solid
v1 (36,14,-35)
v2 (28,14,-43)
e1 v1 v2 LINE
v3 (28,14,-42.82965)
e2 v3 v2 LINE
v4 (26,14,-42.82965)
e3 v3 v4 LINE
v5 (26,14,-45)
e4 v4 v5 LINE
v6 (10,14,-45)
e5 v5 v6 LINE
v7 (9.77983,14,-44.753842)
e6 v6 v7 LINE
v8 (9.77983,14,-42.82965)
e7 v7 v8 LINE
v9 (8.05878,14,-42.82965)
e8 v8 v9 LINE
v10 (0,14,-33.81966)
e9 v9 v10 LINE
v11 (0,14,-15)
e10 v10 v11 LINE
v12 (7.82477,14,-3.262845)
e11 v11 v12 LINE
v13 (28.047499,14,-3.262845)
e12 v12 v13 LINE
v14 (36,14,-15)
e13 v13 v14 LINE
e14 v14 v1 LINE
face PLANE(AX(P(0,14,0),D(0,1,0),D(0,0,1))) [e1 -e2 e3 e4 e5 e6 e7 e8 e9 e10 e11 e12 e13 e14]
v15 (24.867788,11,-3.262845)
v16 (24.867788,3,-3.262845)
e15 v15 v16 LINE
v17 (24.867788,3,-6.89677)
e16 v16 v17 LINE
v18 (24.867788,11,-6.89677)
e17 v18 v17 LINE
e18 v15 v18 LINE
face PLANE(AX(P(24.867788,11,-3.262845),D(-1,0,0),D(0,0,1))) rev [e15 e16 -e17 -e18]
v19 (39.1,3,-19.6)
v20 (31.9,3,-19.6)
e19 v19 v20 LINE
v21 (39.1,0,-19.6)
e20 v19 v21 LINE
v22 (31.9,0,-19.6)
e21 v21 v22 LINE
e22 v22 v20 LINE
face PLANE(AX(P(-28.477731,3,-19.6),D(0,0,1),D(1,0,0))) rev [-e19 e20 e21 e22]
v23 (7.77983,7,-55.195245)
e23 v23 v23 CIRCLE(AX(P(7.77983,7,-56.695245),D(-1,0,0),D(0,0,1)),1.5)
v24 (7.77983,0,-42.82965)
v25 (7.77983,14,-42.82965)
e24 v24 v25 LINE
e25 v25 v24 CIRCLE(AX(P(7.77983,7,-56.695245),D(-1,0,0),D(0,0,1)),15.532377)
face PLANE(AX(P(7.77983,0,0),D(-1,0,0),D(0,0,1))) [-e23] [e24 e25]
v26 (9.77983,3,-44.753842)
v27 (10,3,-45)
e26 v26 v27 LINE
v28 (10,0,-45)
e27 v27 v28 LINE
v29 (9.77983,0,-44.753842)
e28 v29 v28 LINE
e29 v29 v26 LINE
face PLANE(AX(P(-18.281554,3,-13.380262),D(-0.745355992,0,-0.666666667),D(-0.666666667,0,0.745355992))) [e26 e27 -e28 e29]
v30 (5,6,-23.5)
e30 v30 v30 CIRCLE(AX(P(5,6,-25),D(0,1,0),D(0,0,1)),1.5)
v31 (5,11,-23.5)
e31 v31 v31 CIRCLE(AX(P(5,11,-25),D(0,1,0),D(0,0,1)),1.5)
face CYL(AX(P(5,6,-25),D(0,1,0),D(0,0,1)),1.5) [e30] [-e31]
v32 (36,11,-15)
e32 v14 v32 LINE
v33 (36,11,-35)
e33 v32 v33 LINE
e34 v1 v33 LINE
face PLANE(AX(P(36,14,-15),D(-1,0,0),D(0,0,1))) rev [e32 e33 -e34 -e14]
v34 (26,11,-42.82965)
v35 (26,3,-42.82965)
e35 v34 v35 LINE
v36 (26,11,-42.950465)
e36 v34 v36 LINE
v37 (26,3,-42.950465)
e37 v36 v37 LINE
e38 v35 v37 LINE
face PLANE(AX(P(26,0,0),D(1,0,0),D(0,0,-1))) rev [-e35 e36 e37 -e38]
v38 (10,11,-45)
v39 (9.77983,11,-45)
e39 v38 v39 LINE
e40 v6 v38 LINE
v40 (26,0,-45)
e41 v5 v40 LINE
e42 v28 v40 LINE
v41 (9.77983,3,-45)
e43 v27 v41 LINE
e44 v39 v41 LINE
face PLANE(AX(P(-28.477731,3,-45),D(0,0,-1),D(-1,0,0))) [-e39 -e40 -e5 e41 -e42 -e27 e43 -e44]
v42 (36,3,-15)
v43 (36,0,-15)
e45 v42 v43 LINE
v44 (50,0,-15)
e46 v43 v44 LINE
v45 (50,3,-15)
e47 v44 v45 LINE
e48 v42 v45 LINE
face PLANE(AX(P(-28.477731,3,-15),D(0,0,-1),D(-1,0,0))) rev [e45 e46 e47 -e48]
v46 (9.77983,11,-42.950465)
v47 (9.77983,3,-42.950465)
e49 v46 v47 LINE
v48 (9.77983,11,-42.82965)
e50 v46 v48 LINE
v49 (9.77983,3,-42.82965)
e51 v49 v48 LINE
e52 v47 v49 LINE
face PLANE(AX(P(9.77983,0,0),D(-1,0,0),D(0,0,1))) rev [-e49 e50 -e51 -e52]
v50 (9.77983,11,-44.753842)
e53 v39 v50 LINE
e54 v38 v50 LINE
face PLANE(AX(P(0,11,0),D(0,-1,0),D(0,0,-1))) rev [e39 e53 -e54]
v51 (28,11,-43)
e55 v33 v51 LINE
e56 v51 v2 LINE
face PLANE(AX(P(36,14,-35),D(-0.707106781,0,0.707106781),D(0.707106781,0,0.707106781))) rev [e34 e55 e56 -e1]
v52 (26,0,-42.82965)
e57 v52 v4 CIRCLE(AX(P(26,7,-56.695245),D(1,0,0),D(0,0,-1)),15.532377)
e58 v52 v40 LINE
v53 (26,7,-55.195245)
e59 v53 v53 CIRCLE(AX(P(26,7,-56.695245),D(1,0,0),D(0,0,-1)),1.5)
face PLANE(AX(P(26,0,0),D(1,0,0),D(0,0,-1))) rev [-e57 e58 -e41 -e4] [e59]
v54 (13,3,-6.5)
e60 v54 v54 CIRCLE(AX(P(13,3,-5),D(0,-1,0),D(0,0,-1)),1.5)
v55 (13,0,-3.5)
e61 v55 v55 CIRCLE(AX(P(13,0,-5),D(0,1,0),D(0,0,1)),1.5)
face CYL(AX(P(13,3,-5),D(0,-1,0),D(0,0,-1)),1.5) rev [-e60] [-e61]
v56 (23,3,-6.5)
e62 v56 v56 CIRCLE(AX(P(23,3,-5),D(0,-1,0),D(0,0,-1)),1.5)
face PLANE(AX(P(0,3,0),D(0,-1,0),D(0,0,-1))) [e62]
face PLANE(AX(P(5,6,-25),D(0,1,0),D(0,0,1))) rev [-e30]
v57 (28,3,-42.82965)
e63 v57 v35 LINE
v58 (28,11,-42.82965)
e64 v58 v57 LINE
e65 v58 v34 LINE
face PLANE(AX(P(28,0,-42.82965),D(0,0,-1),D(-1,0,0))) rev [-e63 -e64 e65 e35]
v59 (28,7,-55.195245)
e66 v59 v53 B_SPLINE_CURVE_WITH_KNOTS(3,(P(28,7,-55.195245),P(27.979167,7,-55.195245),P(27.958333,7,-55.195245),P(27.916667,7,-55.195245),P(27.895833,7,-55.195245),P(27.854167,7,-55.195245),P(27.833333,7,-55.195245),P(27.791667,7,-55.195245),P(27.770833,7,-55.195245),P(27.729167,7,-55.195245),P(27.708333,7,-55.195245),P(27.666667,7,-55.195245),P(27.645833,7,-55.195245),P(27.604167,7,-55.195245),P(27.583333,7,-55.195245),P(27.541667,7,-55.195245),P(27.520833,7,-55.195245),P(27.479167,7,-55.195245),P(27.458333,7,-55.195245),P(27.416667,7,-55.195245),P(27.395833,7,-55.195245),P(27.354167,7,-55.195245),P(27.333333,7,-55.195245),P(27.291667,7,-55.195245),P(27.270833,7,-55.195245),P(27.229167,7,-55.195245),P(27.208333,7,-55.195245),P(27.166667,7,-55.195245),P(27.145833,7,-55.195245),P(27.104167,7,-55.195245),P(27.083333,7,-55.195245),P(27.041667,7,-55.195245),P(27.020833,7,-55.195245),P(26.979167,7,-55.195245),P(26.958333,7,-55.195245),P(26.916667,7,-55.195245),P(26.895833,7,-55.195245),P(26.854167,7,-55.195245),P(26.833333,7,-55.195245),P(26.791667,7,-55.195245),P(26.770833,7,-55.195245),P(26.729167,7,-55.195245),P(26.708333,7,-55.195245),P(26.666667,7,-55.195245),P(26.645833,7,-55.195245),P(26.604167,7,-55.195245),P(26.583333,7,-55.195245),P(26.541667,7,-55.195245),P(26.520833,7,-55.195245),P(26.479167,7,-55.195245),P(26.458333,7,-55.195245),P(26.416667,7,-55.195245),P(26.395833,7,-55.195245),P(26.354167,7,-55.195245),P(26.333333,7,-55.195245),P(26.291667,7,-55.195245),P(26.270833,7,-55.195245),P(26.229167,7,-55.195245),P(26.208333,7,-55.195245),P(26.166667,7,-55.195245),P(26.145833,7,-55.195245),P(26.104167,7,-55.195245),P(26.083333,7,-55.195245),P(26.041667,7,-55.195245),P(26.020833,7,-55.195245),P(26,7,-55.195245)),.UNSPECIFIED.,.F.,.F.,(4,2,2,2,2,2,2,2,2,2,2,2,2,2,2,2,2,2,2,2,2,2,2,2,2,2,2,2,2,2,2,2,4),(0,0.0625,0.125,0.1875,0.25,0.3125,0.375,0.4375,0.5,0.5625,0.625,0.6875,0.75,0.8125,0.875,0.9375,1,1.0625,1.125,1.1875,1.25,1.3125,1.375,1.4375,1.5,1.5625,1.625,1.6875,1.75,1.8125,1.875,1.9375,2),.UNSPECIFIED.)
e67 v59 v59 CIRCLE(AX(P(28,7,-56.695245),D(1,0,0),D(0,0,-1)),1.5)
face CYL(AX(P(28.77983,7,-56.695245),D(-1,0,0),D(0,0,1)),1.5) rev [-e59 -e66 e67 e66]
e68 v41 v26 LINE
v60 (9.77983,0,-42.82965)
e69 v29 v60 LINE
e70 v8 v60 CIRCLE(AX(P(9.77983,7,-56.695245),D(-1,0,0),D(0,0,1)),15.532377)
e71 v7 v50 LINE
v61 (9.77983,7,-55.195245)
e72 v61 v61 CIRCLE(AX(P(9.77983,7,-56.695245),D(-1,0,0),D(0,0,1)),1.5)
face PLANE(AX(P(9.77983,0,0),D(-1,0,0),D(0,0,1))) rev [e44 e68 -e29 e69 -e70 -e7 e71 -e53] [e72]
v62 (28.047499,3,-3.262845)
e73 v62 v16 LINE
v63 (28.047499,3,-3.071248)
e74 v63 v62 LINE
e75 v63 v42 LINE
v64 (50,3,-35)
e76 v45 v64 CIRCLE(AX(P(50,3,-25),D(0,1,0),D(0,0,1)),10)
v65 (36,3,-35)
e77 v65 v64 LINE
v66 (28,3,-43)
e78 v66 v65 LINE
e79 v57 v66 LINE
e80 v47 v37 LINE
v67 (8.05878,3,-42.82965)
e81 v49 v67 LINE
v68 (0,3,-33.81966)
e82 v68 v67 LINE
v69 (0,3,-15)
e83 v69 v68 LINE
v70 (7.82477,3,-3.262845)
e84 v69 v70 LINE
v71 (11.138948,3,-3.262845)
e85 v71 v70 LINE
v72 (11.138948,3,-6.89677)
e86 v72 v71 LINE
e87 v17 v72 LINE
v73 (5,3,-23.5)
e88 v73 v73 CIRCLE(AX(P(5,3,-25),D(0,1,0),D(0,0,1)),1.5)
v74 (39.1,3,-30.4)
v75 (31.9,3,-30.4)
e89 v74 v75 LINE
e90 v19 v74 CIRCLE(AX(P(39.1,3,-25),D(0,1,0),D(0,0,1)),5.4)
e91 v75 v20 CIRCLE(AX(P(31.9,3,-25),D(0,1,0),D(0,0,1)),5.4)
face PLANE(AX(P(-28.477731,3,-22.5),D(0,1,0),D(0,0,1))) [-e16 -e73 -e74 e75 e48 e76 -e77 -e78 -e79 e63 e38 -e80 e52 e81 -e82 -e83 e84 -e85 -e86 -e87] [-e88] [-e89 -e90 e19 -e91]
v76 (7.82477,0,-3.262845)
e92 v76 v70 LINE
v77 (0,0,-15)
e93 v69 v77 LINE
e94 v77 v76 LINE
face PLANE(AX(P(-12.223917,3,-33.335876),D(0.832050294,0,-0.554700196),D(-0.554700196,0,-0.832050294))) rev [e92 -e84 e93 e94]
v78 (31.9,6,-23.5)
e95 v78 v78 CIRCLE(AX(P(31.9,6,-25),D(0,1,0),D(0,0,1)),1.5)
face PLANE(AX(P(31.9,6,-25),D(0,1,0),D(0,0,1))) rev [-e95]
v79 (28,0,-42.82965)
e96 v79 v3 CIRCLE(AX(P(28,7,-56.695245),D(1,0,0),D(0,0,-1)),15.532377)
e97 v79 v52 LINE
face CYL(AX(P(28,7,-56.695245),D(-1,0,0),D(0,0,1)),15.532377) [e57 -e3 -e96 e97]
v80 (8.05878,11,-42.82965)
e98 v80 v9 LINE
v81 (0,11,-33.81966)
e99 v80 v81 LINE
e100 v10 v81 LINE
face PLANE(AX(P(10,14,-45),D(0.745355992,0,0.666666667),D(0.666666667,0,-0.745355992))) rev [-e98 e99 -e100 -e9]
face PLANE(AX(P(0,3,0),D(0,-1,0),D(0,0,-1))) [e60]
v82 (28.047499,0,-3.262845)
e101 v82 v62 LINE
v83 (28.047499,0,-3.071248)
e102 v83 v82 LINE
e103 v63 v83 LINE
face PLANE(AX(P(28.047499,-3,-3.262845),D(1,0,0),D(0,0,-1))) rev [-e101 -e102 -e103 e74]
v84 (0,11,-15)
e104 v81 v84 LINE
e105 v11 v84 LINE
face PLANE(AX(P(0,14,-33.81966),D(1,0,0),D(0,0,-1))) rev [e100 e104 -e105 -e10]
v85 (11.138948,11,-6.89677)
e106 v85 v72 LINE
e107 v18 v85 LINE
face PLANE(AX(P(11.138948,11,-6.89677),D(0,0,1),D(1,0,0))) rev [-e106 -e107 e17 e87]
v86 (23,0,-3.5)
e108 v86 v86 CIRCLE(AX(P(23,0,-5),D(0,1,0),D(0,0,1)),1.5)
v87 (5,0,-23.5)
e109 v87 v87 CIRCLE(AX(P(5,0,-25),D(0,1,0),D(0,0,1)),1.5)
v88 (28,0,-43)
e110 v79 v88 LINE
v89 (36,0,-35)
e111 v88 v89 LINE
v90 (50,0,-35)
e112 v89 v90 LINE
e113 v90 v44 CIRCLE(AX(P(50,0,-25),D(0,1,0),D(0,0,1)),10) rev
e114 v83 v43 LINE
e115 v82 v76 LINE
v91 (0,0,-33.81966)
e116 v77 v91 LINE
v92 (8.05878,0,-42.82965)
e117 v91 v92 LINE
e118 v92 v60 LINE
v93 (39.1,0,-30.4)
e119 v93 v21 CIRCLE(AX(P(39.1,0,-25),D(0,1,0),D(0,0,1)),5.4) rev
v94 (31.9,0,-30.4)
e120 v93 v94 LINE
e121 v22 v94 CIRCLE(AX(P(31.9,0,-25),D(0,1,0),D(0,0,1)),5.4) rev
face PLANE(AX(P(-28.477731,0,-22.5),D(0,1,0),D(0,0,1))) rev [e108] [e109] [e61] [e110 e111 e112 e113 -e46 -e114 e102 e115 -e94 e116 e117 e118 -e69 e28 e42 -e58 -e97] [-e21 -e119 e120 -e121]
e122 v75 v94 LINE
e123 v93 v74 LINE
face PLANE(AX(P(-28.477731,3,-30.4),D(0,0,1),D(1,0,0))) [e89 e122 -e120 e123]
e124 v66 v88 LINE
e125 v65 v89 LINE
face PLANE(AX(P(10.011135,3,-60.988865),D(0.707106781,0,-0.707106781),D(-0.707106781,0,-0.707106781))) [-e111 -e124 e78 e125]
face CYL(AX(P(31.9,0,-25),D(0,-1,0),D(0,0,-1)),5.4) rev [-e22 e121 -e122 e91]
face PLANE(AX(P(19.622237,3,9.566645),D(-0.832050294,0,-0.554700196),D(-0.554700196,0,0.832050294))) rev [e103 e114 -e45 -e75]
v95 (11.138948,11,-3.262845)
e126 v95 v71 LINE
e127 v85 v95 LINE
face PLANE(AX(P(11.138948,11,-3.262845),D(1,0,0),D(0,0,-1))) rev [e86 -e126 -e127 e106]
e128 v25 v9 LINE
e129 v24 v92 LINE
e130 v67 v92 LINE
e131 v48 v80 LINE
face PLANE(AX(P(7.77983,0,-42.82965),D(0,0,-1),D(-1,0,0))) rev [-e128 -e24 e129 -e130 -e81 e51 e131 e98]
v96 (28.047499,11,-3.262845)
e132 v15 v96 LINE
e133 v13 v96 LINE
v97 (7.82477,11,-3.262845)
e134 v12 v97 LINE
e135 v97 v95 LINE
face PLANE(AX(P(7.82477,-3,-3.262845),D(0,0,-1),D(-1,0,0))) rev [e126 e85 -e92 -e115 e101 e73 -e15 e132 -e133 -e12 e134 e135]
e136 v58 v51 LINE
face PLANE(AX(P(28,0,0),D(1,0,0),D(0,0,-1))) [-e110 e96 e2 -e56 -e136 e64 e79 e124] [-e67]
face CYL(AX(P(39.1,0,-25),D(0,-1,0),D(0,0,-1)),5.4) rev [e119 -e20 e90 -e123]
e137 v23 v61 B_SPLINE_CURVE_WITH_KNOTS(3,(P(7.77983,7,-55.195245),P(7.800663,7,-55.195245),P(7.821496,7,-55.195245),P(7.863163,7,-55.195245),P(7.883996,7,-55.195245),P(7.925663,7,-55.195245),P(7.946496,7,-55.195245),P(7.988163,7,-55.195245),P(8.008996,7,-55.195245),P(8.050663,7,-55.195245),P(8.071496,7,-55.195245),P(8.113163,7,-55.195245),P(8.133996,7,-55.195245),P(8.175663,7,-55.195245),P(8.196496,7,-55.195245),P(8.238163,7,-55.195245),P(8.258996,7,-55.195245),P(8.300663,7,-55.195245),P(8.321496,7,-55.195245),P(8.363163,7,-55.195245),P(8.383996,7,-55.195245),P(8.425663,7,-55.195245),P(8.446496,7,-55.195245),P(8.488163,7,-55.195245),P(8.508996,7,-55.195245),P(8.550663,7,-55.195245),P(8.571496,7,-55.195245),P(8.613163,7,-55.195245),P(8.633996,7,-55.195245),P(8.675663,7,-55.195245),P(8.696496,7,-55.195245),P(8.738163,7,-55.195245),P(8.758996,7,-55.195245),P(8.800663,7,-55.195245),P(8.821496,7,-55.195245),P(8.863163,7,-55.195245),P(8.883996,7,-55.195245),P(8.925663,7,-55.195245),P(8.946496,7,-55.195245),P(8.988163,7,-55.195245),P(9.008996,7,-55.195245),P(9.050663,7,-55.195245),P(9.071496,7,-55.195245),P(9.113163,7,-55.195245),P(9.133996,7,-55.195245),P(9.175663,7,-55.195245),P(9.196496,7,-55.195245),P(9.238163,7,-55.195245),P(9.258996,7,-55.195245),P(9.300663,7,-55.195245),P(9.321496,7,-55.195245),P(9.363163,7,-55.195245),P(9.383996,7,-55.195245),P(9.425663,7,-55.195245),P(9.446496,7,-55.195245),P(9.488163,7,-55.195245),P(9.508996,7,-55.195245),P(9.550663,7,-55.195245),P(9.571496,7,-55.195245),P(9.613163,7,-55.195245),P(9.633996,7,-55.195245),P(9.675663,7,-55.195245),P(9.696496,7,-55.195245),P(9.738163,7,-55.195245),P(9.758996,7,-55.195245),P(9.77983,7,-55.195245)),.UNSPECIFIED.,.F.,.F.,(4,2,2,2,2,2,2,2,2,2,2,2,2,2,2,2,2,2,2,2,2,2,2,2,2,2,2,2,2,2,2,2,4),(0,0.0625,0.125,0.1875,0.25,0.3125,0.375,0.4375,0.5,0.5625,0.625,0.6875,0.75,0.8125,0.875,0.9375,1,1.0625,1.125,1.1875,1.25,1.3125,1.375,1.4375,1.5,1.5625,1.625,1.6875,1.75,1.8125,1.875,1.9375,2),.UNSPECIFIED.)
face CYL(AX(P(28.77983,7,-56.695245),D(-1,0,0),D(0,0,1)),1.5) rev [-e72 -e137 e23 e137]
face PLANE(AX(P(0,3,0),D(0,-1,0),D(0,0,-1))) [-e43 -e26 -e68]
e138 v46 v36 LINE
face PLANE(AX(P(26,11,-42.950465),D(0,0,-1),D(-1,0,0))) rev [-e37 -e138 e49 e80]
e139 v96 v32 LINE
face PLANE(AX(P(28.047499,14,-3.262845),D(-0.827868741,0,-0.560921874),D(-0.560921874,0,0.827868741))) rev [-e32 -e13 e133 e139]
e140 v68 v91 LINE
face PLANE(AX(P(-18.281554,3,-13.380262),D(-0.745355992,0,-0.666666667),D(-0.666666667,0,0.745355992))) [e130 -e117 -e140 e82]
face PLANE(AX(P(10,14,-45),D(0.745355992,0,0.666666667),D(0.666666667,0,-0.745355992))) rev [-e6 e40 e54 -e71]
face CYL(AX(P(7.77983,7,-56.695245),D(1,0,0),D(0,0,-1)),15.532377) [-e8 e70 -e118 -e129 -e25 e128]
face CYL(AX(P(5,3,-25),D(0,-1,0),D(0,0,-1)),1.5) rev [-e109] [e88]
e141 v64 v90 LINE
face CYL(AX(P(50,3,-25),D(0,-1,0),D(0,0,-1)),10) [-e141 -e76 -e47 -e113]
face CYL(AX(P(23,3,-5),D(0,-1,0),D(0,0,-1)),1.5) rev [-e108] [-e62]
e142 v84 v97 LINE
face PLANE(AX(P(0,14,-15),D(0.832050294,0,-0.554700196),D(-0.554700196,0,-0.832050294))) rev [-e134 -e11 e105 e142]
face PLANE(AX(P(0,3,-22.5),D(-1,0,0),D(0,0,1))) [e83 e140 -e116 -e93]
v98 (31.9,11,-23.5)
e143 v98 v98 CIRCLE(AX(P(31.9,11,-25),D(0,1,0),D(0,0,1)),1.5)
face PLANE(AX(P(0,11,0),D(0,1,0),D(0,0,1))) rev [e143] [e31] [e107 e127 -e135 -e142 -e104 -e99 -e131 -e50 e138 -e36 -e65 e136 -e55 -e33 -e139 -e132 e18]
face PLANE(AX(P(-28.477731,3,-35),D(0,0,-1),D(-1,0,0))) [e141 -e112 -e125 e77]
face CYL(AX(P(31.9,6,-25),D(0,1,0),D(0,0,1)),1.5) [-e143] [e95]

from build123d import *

# Parameters (mm, degrees)
SKETCH1_R            = 1.5
BOSS_EXTRUDE1_DEPTH  = 3
FILLET5_RADIUS       = 10
FILLET5_LENGTH       = 3
FILLET2_R            = 5.4
FILLET4_R            = 5.4
SKETCH2_W            = 20.222728951
SKETCH2_H            = 4.462372077
CUT_EXTRUDE1_DEPTH   = 6
BOSS_EXTRUDE2_START  = 8
BOSS_EXTRUDE2_DEPTH  = 3
SKETCH4_W            = 16.22017041
SKETCH4_H            = 2.049534957
SKETCH4_W_2          = 13.728839959
SKETCH4_H_2          = 3.633925055
BOSS_EXTRUDE3_DEPTH  = 8
BOSS_EXTRUDE4_START  = -8
SKETCH5_R            = 1.5
BOSS_EXTRUDE4_DEPTH  = 8
SKETCH6_R            = 1.5
BOSS_EXTRUDE5_DEPTH  = 8
BOSS_EXTRUDE9_DEPTH  = 2
BOSS_EXTRUDE10_START = 2
SKETCH10_W           = 2.049534957
SKETCH10_H           = 8
BOSS_EXTRUDE10_DEPTH = 2
SKETCH11_R           = 1.5
CUT_EXTRUDE2_DEPTH   = 21


with BuildPart() as part:
    # Sketch1 → Boss-Extrude1 (new body)
    # profile 1 of 2: a face of its own
    with BuildSketch(Plane(origin=(0, 0, 0), x_dir=(1, 0, 0), z_dir=(0, 1, 0))):
        with BuildLine():
            Line((3.5, 25), (0, 25))
            Line((0, 25), (0, 15))
            Line((0, 15), (10, 0))
            Line((10, 0), (26, 0))
            Line((26, 0), (36, 15))
            Line((36, 15), (60, 15))
            Line((60, 15), (60, 25))
            Line((60, 25), (44.5, 25))
            Line((44.5, 25), (44.5, 19.6))
            Line((44.5, 19.6), (26.5, 19.6))
            Line((26.5, 19.6), (26.5, 25))
            Line((26.5, 25), (6.5, 25))
            ThreePointArc((6.5, 25), (5, 23.5), (3.5, 25))
        make_face()
        with Locations(Location((13, 5, 0), (0, 0, 270))):
            Circle(SKETCH1_R, mode=Mode.SUBTRACT)
        with Locations(Location((23, 5, 0), (0, 0, 270))):
            Circle(SKETCH1_R, mode=Mode.SUBTRACT)
    # profile 2 of 2: a face of its own
    with BuildSketch(Plane(origin=(0, 0, 0), x_dir=(1, 0, 0), z_dir=(0, 1, 0))):
        with BuildLine():
            Line((10, 45), (0, 33.819660113))
            Line((0, 33.819660113), (0, 25))
            Line((0, 25), (3.5, 25))
            ThreePointArc((3.5, 25), (5, 26.5), (6.5, 25))
            Line((6.5, 25), (26.5, 25))
            Line((26.5, 25), (26.5, 30.4))
            Line((26.5, 30.4), (44.5, 30.4))
            Line((44.5, 30.4), (44.5, 25))
            Line((44.5, 25), (60, 25))
            Line((60, 25), (60, 35))
            Line((60, 35), (36, 35))
            Line((36, 35), (26, 45))
            Line((26, 45), (10, 45))
        make_face()
    extrude(amount=BOSS_EXTRUDE1_DEPTH)

    # Fillet5: full round fillet: the end face becomes a half cylinder, R = half its width
    fillet5_face = Plane((60, 1.5, -25), x_dir=(0, -1, 0), z_dir=(1, 0, 0))  # on the end face: x along it, z out of the body
    fillet5_slab = fillet5_face.offset(-FILLET5_RADIUS / 2) * Box(FILLET5_LENGTH, 2 * FILLET5_RADIUS, FILLET5_RADIUS, mode=Mode.PRIVATE)  # the body's end, R deep
    fillet5_round = Plane((50, 1.5, -25), x_dir=(1, 0, 0), z_dir=(0, -1, 0)) * Cylinder(FILLET5_RADIUS, FILLET5_LENGTH, mode=Mode.PRIVATE)  # its axis R under the face
    add(fillet5_slab - fillet5_round, mode=Mode.SUBTRACT)

    # Fillet2
    fillet2_edges = [part.edges().sort_by_distance(p)[0] for p in [
        (26.5, 1.5, -30.4),
        (26.5, 1.5, -19.6),
    ]]
    fillet(fillet2_edges, radius=FILLET2_R - 0.0001)  # a hair under: the kernel refuses the full size

    # Fillet4
    fillet4_edges = [part.edges().sort_by_distance(p)[0] for p in [
        (44.5, 1.5, -19.6),
        (44.5, 1.5, -30.4),
    ]]
    fillet(fillet4_edges, radius=FILLET4_R - 0.0001)  # a hair under: the kernel refuses the full size

    # Sketch2 → Cut-Extrude1 (cut)
    with BuildSketch(Plane(origin=(0, 3, 0), x_dir=(1, 0, 0), z_dir=(0, 1, 0))):
        with Locations((17.936134509, 1.031658913)):
            Rectangle(SKETCH2_W, SKETCH2_H)
    extrude(amount=-CUT_EXTRUDE1_DEPTH, mode=Mode.SUBTRACT)



with BuildPart() as body_2:
    # Sketch3 → Boss-Extrude2 (new body)
    with BuildSketch(Plane(origin=(0, 3, 0), x_dir=(1, 0, 0), z_dir=(0, 1, 0)).offset(BOSS_EXTRUDE2_START)):
        Polygon((10, 45), (0, 33.819660113), (0, 15), (7.824770033, 3.262844951), (28.047498984, 3.262844951), (36, 15), (36, 35), (26, 45), align=None)
    extrude(amount=BOSS_EXTRUDE2_DEPTH)


with BuildPart() as part_1:
    add(part.part)

    add(body_2.part)  # Boss-Extrude3 merges body 2
    # Sketch4 → Boss-Extrude3 (add)
    with BuildSketch(Plane(origin=(0, 3, 0), x_dir=(1, 0, 0), z_dir=(0, 1, 0))):
        with Locations((17.889914795, 43.975232522)):
            Rectangle(SKETCH4_W, SKETCH4_H)
        with Locations((18.003368014, 5.079807479)):
            Rectangle(SKETCH4_W_2, SKETCH4_H_2)
    extrude(amount=BOSS_EXTRUDE3_DEPTH)

    # Sketch5 → Boss-Extrude4 (add)
    with BuildSketch(Plane(origin=(0, 14, 0), x_dir=(1, 0, 0), z_dir=(0, 1, 0)).offset(BOSS_EXTRUDE4_START)):
        with Locations(Location((5, 25, 0), (0, 0, 270))):
            Circle(SKETCH5_R)
    extrude(amount=BOSS_EXTRUDE4_DEPTH)

    # Sketch6 → Boss-Extrude5 (add)
    with BuildSketch(Plane(origin=(0, 14, 0), x_dir=(1, 0, 0), z_dir=(0, 1, 0))):
        with Locations(Location((31.9, 25, 0), (0, 0, 270))):
            Circle(SKETCH6_R)
    extrude(amount=-BOSS_EXTRUDE5_DEPTH)

    # Sketch7 → Boss-Extrude9 (add)
    # profile 1 of 2: a face of its own
    with BuildSketch(Plane.ZY.offset(-9.77982959)):
        with BuildLine():
            ThreePointArc((-42.829650223, 14), (-72.227622353, 7), (-42.829650223, 0))
            Line((-42.829650223, 0), (-42.829650223, 14))
        make_face()
        Polygon((-44.753841998, 3), (-45, 3), (-45, 11), (-44.753841998, 11), (-42.950465043, 11), (-42.950465043, 3), align=None, mode=Mode.SUBTRACT)
    # profile 2 of 2: a face of its own
    with BuildSketch(Plane.ZY.offset(-9.77982959)):
        Polygon((-45, 11), (-45, 3), (-44.753841998, 3), (-42.950465043, 3), (-42.950465043, 11), (-44.753841998, 11), align=None)
    extrude(amount=BOSS_EXTRUDE9_DEPTH)

    # Sketch10 → Boss-Extrude10 (add)
    # profile 1 of 2: a face of its own
    with BuildSketch(Plane(origin=(26, 0, 0), x_dir=(0, 0, -1), z_dir=(1, 0, 0)).offset(BOSS_EXTRUDE10_START)):
        with BuildLine():
            ThreePointArc((72.227622353, 7), (60.293097644, 22.109936841), (42.829650223, 14))
            Line((42.829650223, 14), (42.829650223, 0))
            ThreePointArc((42.829650223, 0), (60.293097644, -8.109936841), (72.227622353, 7))
        make_face()
        with Locations((43.975232522, 7)):
            Rectangle(SKETCH10_W, SKETCH10_H, mode=Mode.SUBTRACT)
    # profile 2 of 2: a face of its own
    with BuildSketch(Plane(origin=(26, 0, 0), x_dir=(0, 0, -1), z_dir=(1, 0, 0)).offset(BOSS_EXTRUDE10_START)):
        with Locations((43.975232522, 7)):
            Rectangle(SKETCH10_W, SKETCH10_H)
    extrude(amount=-BOSS_EXTRUDE10_DEPTH)

    # Sketch11 → Cut-Extrude2 (cut)
    with BuildSketch(Plane.ZY.offset(-7.77982959)):
        with Locations((-56.695245471, 7)):
            Circle(SKETCH11_R)
    extrude(amount=-CUT_EXTRUDE2_DEPTH, mode=Mode.SUBTRACT)


solid = part_1.part
